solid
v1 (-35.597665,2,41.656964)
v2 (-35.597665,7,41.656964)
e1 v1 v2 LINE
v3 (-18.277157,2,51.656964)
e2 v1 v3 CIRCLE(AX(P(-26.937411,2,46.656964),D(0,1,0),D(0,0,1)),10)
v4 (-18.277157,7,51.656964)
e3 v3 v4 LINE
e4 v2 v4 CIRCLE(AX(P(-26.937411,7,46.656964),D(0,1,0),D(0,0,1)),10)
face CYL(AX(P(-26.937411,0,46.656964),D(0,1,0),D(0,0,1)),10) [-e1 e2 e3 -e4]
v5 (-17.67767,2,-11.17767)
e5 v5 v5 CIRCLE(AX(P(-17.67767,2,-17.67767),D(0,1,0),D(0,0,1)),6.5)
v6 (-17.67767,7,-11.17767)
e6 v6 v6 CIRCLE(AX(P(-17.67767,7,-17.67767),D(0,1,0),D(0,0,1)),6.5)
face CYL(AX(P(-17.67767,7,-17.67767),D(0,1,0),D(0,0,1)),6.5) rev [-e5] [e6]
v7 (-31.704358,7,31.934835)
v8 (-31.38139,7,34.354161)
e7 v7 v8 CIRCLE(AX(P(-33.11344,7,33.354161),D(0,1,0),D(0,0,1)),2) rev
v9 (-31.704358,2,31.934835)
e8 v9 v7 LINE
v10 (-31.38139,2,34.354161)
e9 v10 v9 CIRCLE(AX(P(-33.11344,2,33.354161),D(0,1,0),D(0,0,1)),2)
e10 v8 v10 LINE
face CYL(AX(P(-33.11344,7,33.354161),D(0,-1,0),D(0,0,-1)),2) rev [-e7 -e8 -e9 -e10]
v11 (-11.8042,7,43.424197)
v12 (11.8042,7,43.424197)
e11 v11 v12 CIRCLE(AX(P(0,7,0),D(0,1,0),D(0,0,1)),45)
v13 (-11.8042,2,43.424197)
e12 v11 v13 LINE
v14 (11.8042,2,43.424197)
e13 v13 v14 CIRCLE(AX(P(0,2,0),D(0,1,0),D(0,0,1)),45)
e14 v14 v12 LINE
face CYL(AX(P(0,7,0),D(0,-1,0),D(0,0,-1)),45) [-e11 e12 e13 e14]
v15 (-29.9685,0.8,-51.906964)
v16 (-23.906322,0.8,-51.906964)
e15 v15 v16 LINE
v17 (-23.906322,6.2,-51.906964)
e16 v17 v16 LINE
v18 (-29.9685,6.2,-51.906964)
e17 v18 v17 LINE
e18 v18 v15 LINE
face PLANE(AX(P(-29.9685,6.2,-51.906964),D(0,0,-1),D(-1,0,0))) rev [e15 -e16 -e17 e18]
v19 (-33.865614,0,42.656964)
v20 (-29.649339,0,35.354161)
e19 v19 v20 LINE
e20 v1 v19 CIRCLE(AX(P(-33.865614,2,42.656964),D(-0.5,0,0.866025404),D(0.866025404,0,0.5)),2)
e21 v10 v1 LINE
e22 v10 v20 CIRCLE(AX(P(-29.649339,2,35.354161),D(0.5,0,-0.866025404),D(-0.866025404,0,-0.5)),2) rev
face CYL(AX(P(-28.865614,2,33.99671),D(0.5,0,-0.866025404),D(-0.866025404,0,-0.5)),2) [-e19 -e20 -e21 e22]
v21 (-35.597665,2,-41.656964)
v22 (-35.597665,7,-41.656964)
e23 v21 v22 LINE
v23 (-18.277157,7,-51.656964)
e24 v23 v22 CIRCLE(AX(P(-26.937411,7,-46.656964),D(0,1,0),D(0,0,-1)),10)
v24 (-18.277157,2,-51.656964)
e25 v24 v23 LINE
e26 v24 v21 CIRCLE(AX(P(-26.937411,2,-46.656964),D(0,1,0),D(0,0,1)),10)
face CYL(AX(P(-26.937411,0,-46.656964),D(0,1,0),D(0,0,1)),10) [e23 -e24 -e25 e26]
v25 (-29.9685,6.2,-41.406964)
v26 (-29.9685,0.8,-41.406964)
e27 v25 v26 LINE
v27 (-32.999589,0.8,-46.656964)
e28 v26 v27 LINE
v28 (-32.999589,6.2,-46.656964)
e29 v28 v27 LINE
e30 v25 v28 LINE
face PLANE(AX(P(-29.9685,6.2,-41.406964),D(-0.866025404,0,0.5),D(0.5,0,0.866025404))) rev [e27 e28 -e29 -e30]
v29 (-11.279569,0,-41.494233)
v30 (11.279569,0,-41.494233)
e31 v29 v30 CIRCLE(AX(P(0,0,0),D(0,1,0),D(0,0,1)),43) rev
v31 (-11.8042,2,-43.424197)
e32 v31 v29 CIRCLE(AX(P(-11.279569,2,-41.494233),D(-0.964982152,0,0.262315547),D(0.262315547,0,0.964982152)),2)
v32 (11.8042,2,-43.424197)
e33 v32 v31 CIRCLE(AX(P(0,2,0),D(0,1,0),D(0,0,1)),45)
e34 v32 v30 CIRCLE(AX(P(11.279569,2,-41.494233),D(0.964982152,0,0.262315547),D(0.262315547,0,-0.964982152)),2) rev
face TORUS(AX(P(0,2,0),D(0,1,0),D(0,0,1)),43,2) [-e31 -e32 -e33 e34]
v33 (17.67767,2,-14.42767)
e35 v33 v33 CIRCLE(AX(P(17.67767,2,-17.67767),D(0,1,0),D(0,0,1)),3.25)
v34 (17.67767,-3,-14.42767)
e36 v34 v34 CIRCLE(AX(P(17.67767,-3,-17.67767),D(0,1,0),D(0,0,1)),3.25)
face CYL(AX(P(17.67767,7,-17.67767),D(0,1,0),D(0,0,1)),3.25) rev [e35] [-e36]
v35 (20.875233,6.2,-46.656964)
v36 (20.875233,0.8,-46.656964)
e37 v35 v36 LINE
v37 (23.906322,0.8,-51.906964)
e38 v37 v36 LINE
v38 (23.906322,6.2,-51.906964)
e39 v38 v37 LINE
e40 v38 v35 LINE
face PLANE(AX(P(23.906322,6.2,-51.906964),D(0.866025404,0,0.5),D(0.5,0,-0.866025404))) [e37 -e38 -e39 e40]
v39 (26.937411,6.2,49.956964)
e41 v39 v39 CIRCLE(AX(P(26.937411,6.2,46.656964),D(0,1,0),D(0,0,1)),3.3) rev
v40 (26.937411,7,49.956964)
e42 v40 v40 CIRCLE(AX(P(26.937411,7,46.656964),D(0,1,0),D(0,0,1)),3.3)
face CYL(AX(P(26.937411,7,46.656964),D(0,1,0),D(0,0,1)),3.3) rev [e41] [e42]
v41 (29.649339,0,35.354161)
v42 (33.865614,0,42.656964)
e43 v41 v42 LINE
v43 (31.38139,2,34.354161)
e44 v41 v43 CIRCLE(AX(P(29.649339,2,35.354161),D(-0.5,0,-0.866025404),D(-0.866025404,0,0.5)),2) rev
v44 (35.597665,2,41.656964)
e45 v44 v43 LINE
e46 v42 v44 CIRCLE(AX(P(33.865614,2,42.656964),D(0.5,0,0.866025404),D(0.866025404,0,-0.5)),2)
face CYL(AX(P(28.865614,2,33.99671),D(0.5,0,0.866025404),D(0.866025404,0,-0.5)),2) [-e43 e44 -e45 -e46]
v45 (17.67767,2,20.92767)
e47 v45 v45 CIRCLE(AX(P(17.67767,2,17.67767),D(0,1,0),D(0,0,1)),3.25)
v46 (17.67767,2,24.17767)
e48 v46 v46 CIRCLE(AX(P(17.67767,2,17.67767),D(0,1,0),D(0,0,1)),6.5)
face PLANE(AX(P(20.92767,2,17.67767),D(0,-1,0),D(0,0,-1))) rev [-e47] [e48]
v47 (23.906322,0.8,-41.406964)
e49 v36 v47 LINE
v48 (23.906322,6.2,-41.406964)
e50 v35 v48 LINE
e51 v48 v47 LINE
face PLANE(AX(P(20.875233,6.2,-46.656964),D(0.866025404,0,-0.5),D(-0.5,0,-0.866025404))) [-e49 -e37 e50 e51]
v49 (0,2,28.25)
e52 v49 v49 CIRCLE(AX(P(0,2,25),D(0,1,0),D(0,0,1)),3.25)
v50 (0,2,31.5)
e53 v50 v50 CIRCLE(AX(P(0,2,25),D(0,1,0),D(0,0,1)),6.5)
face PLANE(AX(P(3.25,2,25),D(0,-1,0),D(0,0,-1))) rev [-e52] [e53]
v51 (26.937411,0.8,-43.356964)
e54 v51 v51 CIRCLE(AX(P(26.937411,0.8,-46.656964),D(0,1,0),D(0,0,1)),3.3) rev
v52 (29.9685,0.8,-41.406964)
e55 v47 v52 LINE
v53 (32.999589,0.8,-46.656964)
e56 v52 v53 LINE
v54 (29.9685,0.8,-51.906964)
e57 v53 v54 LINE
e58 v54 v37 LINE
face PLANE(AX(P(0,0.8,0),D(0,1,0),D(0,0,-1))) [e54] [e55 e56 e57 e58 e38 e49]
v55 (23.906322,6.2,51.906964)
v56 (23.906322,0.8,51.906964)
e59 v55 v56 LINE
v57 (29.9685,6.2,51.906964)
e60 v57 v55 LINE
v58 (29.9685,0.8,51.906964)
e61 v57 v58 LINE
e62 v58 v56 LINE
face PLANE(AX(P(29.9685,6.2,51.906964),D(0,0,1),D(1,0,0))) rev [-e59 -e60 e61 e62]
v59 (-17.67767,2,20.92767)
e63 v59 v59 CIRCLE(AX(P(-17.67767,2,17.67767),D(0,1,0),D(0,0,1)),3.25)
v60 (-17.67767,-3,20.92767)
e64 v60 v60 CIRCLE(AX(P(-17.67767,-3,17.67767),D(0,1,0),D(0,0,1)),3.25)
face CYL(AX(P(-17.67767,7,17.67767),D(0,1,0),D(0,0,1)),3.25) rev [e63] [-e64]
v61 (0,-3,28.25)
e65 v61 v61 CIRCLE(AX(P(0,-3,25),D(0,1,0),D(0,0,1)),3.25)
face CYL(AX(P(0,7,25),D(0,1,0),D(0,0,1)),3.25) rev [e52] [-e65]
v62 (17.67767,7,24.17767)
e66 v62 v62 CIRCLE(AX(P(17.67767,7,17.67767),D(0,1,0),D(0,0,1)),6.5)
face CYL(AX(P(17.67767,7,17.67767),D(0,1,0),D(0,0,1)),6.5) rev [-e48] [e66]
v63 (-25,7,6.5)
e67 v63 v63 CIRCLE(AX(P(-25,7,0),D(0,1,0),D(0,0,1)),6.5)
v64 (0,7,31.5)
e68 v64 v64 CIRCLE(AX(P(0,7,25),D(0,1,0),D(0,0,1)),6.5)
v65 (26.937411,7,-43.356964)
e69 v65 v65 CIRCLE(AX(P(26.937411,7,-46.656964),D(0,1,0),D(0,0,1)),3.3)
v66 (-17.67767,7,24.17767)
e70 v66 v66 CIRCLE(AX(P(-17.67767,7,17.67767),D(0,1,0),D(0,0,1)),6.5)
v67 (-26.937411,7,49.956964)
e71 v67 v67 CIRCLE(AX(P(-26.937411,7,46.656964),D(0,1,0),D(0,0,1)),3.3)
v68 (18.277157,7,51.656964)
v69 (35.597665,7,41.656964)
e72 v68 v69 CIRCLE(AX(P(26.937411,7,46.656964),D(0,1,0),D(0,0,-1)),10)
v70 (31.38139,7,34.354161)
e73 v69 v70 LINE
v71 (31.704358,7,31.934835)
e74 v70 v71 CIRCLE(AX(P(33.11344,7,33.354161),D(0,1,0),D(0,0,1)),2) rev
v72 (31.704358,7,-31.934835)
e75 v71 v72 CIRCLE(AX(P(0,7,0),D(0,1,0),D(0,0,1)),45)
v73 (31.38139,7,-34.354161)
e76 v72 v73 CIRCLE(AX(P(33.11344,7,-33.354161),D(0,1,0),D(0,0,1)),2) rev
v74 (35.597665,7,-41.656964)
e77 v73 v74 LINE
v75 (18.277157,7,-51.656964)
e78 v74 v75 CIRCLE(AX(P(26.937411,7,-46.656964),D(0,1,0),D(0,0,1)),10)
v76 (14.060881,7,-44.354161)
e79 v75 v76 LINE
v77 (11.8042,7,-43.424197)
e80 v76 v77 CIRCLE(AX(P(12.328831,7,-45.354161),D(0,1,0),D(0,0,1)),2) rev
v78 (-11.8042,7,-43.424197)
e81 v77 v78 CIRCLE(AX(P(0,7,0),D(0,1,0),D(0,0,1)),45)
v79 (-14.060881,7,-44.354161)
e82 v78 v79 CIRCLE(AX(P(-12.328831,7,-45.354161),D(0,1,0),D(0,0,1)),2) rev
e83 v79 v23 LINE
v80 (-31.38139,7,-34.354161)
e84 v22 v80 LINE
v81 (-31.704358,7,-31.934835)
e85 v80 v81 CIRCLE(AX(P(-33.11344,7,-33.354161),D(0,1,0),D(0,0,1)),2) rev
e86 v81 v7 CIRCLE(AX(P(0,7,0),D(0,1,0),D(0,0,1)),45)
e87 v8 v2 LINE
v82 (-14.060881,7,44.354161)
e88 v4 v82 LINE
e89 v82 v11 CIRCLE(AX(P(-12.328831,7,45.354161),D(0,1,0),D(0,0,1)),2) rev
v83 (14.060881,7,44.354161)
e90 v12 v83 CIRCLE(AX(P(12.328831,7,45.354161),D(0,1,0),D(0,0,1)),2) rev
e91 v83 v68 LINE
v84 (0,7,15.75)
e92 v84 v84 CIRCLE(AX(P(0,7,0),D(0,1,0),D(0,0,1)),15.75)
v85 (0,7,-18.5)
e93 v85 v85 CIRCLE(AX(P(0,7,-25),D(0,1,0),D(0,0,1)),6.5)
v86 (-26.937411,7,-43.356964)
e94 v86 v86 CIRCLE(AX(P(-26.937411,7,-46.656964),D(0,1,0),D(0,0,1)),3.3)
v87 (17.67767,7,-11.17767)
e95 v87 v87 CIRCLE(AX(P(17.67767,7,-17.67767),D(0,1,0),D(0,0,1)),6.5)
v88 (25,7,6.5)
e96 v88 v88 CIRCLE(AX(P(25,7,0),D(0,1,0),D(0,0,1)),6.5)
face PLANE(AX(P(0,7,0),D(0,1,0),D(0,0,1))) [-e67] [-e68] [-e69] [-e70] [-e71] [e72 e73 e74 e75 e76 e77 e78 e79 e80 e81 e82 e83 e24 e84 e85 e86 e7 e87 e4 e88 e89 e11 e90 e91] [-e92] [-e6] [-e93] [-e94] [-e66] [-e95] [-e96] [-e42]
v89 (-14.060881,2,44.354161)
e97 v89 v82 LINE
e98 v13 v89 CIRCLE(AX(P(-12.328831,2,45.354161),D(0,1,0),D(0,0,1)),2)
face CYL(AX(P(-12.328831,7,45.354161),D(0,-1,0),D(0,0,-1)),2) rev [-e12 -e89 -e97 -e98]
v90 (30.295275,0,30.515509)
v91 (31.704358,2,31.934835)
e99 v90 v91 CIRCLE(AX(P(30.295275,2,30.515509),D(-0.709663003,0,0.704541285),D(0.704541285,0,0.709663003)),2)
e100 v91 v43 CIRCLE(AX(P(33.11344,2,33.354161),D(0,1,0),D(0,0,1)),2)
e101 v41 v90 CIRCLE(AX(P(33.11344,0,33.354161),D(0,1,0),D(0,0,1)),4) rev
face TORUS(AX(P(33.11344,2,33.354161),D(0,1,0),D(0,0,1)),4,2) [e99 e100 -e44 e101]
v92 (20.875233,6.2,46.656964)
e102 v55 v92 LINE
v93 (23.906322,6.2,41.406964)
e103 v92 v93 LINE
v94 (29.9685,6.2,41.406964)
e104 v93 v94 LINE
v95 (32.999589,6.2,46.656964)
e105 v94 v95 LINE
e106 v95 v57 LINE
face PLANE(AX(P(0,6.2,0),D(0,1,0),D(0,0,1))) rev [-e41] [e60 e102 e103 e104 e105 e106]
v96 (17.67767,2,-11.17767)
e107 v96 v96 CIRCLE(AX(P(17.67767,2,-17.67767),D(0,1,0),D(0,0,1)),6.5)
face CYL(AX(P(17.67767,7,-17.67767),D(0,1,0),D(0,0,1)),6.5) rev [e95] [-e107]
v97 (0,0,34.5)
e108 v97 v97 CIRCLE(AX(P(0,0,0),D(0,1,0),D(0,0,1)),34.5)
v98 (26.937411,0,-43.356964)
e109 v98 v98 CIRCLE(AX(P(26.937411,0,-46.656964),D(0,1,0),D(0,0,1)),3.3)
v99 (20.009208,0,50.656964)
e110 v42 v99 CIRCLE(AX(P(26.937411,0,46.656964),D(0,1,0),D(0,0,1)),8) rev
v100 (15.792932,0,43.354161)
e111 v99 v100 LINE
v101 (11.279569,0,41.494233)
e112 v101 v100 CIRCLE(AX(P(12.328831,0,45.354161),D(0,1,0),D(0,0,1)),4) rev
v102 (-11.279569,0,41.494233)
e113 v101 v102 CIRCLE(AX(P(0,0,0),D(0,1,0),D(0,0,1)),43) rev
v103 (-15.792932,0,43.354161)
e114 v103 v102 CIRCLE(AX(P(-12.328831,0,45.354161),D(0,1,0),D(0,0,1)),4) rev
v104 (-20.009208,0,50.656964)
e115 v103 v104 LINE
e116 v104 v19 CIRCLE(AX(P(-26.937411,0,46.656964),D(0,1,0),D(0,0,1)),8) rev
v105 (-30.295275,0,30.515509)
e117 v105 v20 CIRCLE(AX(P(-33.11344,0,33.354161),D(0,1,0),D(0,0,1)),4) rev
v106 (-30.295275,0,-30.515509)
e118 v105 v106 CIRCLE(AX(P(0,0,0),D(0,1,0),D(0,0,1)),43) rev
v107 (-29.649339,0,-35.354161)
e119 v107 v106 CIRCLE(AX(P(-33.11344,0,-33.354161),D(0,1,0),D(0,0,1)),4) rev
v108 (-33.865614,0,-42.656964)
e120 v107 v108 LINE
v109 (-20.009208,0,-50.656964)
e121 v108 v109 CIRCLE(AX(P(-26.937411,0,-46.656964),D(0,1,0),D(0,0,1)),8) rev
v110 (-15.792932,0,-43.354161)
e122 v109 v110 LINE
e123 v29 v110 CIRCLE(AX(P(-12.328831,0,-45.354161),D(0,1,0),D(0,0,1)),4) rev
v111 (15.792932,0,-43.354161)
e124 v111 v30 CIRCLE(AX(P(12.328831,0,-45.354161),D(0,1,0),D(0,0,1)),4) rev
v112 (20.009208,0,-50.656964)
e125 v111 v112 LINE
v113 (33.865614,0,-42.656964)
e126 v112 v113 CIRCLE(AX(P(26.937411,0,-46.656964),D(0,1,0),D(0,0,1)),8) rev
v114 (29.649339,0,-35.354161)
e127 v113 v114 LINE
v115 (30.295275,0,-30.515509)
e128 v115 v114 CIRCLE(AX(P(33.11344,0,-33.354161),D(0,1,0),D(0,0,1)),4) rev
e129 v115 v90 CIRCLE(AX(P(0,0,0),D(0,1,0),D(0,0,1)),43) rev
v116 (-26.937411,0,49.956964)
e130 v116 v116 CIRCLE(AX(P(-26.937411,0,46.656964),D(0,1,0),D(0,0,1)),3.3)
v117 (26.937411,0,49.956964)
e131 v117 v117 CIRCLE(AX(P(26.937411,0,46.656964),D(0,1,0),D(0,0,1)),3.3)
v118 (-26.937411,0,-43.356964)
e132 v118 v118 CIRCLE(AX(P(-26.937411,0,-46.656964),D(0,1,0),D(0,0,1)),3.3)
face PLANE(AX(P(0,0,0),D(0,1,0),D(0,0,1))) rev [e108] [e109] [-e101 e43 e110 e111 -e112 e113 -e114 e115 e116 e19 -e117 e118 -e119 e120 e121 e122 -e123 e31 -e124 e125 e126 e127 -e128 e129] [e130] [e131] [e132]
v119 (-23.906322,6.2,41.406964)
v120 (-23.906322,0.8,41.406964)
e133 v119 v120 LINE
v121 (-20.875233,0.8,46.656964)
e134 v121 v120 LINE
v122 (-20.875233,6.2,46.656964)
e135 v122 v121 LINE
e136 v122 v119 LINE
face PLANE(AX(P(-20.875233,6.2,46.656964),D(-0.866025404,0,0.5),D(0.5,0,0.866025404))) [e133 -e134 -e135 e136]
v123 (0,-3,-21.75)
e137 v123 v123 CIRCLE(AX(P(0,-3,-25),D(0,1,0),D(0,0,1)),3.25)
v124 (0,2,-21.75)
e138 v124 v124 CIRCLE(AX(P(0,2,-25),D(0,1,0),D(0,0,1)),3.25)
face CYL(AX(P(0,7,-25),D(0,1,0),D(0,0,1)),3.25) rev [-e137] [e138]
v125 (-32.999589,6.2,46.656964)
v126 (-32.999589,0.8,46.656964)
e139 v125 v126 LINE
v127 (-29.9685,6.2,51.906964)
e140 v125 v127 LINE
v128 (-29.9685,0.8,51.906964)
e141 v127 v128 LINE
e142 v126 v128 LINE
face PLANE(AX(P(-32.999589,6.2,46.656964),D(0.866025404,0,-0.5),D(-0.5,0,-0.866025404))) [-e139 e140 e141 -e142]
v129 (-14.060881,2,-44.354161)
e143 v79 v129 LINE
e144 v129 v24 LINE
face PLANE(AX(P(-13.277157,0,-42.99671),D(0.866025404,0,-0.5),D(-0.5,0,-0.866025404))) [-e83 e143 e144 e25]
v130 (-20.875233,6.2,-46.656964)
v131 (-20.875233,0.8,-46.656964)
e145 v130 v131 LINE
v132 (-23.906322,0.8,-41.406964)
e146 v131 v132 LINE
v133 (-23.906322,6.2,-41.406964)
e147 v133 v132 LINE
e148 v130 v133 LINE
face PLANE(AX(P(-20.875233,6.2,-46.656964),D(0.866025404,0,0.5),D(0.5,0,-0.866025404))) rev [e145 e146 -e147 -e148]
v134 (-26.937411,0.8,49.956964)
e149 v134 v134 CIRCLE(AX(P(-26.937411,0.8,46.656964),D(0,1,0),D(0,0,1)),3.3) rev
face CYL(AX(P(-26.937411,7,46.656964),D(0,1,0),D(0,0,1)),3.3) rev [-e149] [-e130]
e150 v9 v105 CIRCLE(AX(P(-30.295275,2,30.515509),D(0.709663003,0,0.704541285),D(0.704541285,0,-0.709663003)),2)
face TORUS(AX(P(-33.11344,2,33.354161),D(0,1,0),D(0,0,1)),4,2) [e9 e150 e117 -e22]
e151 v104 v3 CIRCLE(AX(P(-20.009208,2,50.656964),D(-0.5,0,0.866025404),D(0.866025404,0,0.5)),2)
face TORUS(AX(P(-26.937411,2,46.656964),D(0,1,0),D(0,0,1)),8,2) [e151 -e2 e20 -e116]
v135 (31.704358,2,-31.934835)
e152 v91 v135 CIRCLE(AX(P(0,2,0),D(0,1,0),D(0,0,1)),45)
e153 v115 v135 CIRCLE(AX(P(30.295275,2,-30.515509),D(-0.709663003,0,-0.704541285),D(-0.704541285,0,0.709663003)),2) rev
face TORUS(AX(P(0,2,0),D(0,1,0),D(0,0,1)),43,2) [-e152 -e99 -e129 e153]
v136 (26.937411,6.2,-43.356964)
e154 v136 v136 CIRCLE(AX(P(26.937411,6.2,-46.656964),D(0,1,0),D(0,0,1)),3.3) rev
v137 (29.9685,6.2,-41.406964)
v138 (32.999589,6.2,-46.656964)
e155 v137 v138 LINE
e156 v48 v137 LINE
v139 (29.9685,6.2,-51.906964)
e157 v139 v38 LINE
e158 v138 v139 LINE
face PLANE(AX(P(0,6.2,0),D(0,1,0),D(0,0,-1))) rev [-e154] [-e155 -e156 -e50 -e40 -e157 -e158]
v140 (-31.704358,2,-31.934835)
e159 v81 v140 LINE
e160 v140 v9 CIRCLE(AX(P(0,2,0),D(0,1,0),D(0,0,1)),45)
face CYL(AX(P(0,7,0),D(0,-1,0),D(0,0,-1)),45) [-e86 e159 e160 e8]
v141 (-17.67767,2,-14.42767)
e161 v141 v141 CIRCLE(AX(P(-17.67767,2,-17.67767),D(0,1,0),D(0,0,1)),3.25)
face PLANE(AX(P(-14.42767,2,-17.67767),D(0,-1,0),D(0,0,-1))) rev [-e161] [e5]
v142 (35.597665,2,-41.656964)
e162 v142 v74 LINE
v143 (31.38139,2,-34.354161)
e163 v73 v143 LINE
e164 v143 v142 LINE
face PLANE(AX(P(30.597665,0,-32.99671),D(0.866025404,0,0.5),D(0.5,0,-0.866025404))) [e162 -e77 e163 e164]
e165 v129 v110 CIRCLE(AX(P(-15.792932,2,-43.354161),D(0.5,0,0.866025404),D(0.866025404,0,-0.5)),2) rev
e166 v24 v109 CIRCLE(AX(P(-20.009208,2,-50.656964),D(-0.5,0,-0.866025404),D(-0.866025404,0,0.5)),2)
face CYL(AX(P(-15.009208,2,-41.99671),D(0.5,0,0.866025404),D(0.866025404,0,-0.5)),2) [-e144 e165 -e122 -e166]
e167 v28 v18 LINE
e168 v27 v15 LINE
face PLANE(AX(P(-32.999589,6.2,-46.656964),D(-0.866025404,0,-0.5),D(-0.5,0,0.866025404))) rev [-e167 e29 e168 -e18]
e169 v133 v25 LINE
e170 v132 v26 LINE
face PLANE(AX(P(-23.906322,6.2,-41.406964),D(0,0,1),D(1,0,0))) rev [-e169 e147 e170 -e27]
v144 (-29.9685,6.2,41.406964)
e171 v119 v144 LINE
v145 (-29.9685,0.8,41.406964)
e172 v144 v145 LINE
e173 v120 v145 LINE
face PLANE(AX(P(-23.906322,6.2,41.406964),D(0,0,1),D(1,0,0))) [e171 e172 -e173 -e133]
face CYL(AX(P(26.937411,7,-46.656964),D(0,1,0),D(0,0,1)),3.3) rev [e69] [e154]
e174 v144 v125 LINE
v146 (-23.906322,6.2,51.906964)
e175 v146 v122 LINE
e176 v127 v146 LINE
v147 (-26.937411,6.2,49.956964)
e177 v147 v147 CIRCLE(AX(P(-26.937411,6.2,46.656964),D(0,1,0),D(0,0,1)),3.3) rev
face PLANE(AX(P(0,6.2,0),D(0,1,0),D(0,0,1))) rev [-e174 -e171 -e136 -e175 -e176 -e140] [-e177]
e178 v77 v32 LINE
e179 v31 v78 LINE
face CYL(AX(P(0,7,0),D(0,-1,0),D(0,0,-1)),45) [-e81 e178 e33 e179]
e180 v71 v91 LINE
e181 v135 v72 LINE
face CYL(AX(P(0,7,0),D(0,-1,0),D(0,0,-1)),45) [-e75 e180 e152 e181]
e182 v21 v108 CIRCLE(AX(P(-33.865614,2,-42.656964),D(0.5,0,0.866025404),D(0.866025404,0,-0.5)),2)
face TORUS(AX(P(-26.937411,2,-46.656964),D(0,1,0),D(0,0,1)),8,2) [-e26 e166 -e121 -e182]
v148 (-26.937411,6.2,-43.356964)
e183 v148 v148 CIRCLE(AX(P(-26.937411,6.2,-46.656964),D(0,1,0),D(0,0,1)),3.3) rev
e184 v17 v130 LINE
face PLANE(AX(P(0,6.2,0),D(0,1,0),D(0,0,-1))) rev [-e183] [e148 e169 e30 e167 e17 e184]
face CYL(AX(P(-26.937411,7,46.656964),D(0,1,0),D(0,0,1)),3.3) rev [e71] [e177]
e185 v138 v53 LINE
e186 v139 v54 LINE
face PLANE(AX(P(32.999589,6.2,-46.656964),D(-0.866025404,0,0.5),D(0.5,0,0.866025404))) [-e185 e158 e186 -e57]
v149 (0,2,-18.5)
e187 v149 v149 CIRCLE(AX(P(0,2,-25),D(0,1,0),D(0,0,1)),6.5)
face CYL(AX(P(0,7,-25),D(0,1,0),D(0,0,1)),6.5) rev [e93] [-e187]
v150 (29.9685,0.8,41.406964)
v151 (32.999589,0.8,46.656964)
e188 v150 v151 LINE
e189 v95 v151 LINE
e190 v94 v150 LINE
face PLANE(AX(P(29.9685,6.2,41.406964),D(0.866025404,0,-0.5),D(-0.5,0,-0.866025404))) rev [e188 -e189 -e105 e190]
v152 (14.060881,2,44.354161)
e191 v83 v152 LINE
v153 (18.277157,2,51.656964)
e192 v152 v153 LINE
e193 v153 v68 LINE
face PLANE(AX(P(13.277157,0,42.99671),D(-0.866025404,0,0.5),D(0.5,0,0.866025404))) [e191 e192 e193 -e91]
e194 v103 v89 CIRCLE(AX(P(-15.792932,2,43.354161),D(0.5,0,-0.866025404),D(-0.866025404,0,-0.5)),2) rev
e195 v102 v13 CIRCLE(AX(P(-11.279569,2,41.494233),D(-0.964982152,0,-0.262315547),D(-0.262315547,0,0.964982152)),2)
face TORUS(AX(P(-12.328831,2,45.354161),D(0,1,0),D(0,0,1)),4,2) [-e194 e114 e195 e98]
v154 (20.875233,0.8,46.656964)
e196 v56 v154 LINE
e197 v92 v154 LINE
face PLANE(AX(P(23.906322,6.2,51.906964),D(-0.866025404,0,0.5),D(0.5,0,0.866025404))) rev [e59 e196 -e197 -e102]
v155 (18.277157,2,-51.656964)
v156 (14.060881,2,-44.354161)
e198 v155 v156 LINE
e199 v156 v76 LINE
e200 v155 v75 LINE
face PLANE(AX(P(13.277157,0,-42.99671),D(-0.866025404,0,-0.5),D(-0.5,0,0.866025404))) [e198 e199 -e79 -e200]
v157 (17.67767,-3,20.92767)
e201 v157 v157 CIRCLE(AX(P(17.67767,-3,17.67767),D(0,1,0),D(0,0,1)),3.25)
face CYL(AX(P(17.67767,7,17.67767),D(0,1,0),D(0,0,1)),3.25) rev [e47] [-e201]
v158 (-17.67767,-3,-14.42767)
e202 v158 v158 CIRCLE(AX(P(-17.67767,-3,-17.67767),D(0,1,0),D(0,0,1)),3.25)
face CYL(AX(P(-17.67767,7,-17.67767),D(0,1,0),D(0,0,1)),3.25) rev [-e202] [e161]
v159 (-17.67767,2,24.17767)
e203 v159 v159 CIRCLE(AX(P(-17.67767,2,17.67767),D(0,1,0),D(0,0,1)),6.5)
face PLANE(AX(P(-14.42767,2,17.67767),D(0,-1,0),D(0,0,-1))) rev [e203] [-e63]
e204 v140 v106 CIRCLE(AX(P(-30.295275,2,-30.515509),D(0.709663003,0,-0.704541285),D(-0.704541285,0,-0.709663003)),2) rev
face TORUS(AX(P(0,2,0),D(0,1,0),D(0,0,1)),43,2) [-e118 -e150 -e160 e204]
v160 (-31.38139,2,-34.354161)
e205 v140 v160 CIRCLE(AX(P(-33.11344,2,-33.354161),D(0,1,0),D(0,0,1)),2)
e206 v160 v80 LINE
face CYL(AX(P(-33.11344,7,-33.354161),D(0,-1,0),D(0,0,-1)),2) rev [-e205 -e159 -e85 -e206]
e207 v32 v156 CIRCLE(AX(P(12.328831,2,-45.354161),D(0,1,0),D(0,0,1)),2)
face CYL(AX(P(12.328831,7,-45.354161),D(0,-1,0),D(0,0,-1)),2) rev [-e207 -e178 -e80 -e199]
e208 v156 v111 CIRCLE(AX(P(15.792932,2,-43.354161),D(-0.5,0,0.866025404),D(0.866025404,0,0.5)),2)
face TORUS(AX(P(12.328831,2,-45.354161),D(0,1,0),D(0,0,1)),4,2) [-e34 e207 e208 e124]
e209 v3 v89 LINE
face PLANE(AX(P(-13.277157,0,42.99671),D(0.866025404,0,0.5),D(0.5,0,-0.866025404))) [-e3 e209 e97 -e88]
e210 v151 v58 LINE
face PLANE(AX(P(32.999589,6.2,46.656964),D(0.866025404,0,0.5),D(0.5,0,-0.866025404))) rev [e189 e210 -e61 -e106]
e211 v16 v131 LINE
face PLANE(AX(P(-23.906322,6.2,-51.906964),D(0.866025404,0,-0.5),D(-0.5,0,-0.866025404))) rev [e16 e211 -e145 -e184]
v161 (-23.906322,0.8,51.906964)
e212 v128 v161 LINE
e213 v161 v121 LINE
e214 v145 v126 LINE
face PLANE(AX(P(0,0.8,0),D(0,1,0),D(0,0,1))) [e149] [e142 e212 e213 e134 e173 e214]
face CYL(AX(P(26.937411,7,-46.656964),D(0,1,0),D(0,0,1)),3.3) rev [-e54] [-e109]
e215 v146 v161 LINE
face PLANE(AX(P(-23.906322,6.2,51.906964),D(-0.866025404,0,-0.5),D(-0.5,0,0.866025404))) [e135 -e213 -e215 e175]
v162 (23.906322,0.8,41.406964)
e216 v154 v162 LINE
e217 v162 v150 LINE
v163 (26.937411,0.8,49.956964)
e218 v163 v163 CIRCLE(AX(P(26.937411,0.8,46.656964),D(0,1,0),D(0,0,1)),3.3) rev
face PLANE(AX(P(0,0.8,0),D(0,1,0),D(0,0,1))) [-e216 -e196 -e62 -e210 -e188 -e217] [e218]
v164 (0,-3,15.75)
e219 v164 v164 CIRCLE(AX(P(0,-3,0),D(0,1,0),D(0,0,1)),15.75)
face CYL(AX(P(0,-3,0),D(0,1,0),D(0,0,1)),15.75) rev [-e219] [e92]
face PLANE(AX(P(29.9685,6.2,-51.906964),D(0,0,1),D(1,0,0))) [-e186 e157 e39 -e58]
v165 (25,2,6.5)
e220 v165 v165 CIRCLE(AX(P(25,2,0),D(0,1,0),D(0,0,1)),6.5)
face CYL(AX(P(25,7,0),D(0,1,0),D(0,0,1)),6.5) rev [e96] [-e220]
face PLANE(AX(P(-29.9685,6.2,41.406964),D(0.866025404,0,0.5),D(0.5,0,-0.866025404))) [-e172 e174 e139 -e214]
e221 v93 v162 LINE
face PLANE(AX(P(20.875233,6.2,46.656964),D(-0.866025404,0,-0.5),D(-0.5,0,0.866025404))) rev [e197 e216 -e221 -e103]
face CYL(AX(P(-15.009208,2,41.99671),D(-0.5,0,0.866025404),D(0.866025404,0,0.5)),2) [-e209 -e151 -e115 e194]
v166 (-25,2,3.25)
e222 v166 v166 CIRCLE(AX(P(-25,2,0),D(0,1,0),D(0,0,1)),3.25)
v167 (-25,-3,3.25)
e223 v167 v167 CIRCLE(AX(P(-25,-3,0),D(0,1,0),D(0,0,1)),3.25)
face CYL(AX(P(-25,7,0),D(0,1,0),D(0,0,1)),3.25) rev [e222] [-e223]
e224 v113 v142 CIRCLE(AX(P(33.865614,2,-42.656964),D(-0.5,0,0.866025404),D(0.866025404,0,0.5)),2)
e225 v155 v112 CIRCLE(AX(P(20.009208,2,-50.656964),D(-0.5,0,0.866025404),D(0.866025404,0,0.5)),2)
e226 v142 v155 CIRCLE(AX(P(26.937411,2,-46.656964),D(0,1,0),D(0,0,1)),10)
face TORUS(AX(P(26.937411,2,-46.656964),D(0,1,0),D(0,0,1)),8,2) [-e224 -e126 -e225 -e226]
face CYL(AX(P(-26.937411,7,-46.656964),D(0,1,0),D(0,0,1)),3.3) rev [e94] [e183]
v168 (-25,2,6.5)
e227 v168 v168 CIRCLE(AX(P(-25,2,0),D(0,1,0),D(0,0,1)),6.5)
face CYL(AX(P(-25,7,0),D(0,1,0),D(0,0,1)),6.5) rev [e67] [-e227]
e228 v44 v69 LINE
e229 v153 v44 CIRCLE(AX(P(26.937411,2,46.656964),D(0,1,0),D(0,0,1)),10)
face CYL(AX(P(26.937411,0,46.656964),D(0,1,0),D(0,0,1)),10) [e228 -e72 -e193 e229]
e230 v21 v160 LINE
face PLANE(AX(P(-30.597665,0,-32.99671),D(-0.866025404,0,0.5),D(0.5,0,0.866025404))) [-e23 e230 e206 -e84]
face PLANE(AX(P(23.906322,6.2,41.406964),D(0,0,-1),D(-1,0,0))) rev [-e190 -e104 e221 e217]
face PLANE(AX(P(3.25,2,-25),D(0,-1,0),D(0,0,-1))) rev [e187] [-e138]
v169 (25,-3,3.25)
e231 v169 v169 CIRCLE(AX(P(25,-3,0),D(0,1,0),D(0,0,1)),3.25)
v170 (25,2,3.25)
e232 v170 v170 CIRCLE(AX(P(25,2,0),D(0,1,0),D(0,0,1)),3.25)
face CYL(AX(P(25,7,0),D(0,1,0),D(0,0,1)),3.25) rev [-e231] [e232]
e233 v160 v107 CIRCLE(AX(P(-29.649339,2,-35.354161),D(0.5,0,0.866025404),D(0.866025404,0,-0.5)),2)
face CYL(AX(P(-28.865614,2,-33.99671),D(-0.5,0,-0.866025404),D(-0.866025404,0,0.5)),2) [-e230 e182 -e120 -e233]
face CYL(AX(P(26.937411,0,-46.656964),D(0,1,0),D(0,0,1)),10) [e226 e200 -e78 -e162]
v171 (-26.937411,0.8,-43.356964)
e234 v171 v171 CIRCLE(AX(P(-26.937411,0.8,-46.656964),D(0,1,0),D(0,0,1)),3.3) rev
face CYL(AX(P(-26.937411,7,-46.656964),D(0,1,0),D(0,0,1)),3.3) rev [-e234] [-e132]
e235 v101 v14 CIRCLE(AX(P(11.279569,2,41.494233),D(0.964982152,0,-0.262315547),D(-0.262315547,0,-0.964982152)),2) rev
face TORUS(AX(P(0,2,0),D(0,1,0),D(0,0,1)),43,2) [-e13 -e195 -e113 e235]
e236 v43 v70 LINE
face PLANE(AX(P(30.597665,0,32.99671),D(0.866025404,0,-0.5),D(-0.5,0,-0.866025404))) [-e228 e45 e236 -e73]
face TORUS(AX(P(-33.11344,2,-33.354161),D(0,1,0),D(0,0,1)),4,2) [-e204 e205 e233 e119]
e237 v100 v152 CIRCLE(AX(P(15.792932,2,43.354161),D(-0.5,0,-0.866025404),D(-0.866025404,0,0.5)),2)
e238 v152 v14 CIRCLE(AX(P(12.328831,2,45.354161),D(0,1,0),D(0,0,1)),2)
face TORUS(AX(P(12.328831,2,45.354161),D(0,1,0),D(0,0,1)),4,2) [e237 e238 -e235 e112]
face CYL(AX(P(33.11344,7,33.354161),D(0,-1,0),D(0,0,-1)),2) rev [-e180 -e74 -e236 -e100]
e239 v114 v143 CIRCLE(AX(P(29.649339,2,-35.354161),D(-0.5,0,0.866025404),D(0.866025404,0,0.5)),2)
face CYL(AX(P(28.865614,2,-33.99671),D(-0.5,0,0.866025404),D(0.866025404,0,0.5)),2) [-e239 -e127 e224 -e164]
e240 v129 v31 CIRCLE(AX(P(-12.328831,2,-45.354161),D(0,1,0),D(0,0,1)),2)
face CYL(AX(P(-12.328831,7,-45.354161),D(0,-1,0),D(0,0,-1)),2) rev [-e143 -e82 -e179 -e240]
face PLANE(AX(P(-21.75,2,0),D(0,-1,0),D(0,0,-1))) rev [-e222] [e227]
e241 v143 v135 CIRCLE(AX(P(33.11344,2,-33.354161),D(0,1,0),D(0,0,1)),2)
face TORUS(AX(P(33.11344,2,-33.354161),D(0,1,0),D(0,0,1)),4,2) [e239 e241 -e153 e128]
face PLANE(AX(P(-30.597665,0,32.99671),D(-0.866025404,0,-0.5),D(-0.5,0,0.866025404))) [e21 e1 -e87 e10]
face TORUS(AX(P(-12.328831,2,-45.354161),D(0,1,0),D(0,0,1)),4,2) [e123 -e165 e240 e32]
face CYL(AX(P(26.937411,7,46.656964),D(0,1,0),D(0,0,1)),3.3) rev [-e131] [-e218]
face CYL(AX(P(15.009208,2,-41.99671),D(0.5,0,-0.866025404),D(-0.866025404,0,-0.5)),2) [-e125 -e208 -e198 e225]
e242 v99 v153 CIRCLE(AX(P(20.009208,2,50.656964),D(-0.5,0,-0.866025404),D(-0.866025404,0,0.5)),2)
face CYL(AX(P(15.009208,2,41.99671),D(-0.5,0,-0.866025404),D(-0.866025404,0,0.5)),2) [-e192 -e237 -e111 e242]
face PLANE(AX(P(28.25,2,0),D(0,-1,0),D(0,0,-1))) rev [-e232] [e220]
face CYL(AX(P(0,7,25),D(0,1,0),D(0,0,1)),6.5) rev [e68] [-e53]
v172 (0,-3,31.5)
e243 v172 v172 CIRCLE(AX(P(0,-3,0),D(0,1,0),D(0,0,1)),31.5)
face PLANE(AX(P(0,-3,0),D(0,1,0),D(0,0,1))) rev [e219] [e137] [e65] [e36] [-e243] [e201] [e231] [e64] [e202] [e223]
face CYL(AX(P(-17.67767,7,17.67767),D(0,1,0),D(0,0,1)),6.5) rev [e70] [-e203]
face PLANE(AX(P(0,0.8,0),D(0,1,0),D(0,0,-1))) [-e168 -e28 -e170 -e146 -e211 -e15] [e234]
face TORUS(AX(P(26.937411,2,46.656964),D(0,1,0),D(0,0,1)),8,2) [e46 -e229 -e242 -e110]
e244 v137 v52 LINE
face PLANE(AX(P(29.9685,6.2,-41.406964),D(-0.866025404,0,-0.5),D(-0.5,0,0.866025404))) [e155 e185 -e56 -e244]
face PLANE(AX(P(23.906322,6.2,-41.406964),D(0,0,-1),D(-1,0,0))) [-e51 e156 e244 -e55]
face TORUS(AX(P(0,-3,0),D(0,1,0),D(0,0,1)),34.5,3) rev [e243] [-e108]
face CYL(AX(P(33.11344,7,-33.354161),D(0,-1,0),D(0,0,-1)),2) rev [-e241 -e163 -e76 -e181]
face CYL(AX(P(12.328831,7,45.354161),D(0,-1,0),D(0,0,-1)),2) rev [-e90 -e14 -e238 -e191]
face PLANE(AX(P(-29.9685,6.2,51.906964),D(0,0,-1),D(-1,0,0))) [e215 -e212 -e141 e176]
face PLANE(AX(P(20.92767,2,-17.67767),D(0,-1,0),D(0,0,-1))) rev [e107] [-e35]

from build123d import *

# Parameters (mm, degrees)
SKETCH1_R                               = 45
BOSS_EXTRUDE1_DEPTH                     = 7
SKETCH10_R                              = 31.5
BOSS_EXTRUDE3_DEPTH                     = 3
CUT_EXTRUDE1_DEPTH                      = 65.02343321
CUT_EXTRUDE1_DEPTH_BACK                 = 65.02343321
SKETCH12_R                              = 15.75
CBORE_FOR_M6_HEX_HEAD_BOLT4_D           = 6.5
CBORE_FOR_M6_HEX_HEAD_BOLT4_CBORE_D     = 13
CBORE_FOR_M6_HEX_HEAD_BOLT4_CBORE_DEPTH = 5
CIRPATTERN11_COUNT                      = 8
BOSS_EXTRUDE4_DEPTH                     = 7
M6_CLEARANCE_HOLE1_D                    = 6.6
FILLET5_R                               = 2
CUT_EXTRUDE2_DEPTH                      = 2.7
MIRROR2_COPY_1_DEPTH                    = 2.7
FILLET7_R                               = 3


with BuildPart() as part:
    # Sketch1 → Boss-Extrude1 (new body)
    with BuildSketch(Plane(origin=(0, 0, 0), x_dir=(1, 0, 0), z_dir=(0, 1, 0))):
        with Locations(Location((0, 0, 0), (0, 0, 270))):
            Circle(SKETCH1_R)
    extrude(amount=BOSS_EXTRUDE1_DEPTH)

    # Sketch10 → Boss-Extrude3 (add)
    with BuildSketch(Plane(origin=(0, 0, 0), x_dir=(1, 0, 0), z_dir=(0, 1, 0))):
        with Locations(Location((0, 0, 0), (0, 0, 270))):
            Circle(SKETCH10_R)
    extrude(amount=-BOSS_EXTRUDE3_DEPTH)

    # Sketch12 → Cut-Extrude1 (cut, two sides: drawn at the far end of the back side and taken through both)
    with BuildSketch(Plane(origin=(0, 0, 0), x_dir=(1, 0, 0), z_dir=(0, 1, 0)).offset(-CUT_EXTRUDE1_DEPTH_BACK)):
        with Locations(Location((0, 0, 0), (0, 0, 270))):
            Circle(SKETCH12_R)
    extrude(amount=CUT_EXTRUDE1_DEPTH + CUT_EXTRUDE1_DEPTH_BACK, mode=Mode.SUBTRACT)

    # CBORE for M6 Hex Head Bolt4 (through all)
    with Locations(Plane(origin=(0, 7, 0), x_dir=(1, 0, 0), z_dir=(0, 1, 0))):
        with Locations((0, 25)):
            cbore_for_m6_hex_head_bolt4 = CounterBoreHole(CBORE_FOR_M6_HEX_HEAD_BOLT4_D / 2, CBORE_FOR_M6_HEX_HEAD_BOLT4_CBORE_D / 2, CBORE_FOR_M6_HEX_HEAD_BOLT4_CBORE_DEPTH)

    # CirPattern11: CBORE for M6 Hex Head Bolt4 ×8 about axis
    cirpattern11_axis = Axis((0, 0, 0), (0, 1, 0))
    for i in range(1, CIRPATTERN11_COUNT):
        add(cbore_for_m6_hex_head_bolt4.rotate(cirpattern11_axis, i * 360 / CIRPATTERN11_COUNT), mode=Mode.SUBTRACT)

    # Sketch19 → Boss-Extrude4 (add)
    with BuildSketch(Plane(origin=(0, 7, 0), x_dir=(1, 0, 0), z_dir=(0, 1, 0))):
        with BuildLine():
            Line((-30.597665006, 32.996710384), (-35.597665006, 41.656964422))
            ThreePointArc((-35.597665006, 41.656964422), (-31.937410968, 55.31721846), (-18.277156931, 51.656964422))
            Line((-18.277156931, 51.656964422), (-13.277156931, 42.996710384))
            Line((-13.277156931, 42.996710384), (-30.597665006, 32.996710384))
        make_face()
        with BuildLine():
            Line((13.277156931, 42.996710384), (18.277156931, 51.656964422))
            ThreePointArc((18.277156931, 51.656964422), (31.937410968, 55.31721846), (35.597665006, 41.656964422))
            Line((35.597665006, 41.656964422), (30.597665006, 32.996710384))
            Line((30.597665006, 32.996710384), (13.277156931, 42.996710384))
        make_face()
        with BuildLine():
            Line((30.597665006, -32.996710384), (35.597665006, -41.656964422))
            ThreePointArc((35.597665006, -41.656964422), (31.937410968, -55.31721846), (18.277156931, -51.656964422))
            Line((18.277156931, -51.656964422), (13.277156931, -42.996710384))
            Line((13.277156931, -42.996710384), (30.597665006, -32.996710384))
        make_face()
        with BuildLine():
            Line((-13.277156931, -42.996710384), (-18.277156931, -51.656964422))
            ThreePointArc((-18.277156931, -51.656964422), (-31.937410968, -55.31721846), (-35.597665006, -41.656964422))
            Line((-35.597665006, -41.656964422), (-30.597665006, -32.996710384))
            Line((-30.597665006, -32.996710384), (-13.277156931, -42.996710384))
        make_face()
    extrude(amount=-BOSS_EXTRUDE4_DEPTH)

    # M6 Clearance Hole1 (through all)
    with Locations(Plane(origin=(0, 7, 0), x_dir=(1, 0, 0), z_dir=(0, 1, 0))):
        with Locations((-26.937410968, 46.656964422), (26.937410968, 46.656964422), (-26.937410968, -46.656964422), (26.937410968, -46.656964422)):
            Hole(M6_CLEARANCE_HOLE1_D / 2)

    # Fillet5
    fillet5_edges = [part.edges().sort_by_distance(p)[0] for p in [
        (45, 0, 0),
        (31.937410968, 0, 55.31721846),
        (15.777156931, 0, 47.326837403),
        (13.277156931, 3.5, 42.996710384),
        (33.097665006, 0, 37.326837403),
        (30.597665006, 3.5, 32.996710384),
        (0, 0, 45),
        (-31.937410968, 0, 55.31721846),
        (-33.097665006, 0, 37.326837403),
        (-30.597665006, 3.5, 32.996710384),
        (-15.777156931, 0, 47.326837403),
        (-13.277156931, 3.5, 42.996710384),
        (-45, 0, 0),
        (-13.277156931, 3.5, -42.996710384),
        (-33.097665006, 0, -37.326837403),
        (-30.597665006, 3.5, -32.996710384),
        (-31.937410968, 0, -55.31721846),
        (-15.777156931, 0, -47.326837403),
        (0, 0, -45),
        (31.937410968, 0, -55.31721846),
        (33.097665006, 0, -37.326837403),
        (30.597665006, 3.5, -32.996710384),
        (15.777156931, 0, -47.326837403),
        (13.277156931, 3.5, -42.996710384),
    ]]
    fillet(fillet5_edges, radius=FILLET5_R)

    # Sketch22 → Cut-Extrude2 (cut, symmetric)
    with BuildSketch(Plane(origin=(0, 3.5, 0), x_dir=(1, 0, 0), z_dir=(0, 1, 0))):
        Polygon((-23.906322055, -41.406964422), (-29.968499882, -41.406964422), (-32.999588795, -46.656964422), (-29.968499882, -51.906964422), (-23.906322055, -51.906964422), (-20.875233142, -46.656964422), align=None)
    cut_extrude2 = extrude(amount=CUT_EXTRUDE2_DEPTH, both=True, mode=Mode.SUBTRACT)

    # Mirror1: Cut-Extrude2 across plane
    add(cut_extrude2.mirror(Plane(origin=(0, 0, 0), x_dir=(0, 0, 1), z_dir=(1, 0, 0))), mode=Mode.SUBTRACT)

    # Mirror2: Cut-Extrude2 across plane
    add(cut_extrude2.mirror(Plane.XY), mode=Mode.SUBTRACT)

    # Mirror2 copy 1 sketch → Mirror2 copy 1 (cut, symmetric)
    with BuildSketch(Plane(origin=(0, 3.5, 0), x_dir=(-1, 0, 0), z_dir=(0, 1, 0))):
        Polygon((-23.906322055, -41.406964422), (-29.968499882, -41.406964422), (-32.999588795, -46.656964422), (-29.968499882, -51.906964422), (-23.906322055, -51.906964422), (-20.875233142, -46.656964422), align=None)
    extrude(amount=MIRROR2_COPY_1_DEPTH, both=True, mode=Mode.SUBTRACT)

    # Fillet7
    fillet7_edges = [part.edges().sort_by_distance(p)[0] for p in [
        (0, 0, -31.5),
    ]]
    fillet(fillet7_edges, radius=FILLET7_R - 0.0001)  # a hair under: the kernel refuses the full size


solid = part.part
